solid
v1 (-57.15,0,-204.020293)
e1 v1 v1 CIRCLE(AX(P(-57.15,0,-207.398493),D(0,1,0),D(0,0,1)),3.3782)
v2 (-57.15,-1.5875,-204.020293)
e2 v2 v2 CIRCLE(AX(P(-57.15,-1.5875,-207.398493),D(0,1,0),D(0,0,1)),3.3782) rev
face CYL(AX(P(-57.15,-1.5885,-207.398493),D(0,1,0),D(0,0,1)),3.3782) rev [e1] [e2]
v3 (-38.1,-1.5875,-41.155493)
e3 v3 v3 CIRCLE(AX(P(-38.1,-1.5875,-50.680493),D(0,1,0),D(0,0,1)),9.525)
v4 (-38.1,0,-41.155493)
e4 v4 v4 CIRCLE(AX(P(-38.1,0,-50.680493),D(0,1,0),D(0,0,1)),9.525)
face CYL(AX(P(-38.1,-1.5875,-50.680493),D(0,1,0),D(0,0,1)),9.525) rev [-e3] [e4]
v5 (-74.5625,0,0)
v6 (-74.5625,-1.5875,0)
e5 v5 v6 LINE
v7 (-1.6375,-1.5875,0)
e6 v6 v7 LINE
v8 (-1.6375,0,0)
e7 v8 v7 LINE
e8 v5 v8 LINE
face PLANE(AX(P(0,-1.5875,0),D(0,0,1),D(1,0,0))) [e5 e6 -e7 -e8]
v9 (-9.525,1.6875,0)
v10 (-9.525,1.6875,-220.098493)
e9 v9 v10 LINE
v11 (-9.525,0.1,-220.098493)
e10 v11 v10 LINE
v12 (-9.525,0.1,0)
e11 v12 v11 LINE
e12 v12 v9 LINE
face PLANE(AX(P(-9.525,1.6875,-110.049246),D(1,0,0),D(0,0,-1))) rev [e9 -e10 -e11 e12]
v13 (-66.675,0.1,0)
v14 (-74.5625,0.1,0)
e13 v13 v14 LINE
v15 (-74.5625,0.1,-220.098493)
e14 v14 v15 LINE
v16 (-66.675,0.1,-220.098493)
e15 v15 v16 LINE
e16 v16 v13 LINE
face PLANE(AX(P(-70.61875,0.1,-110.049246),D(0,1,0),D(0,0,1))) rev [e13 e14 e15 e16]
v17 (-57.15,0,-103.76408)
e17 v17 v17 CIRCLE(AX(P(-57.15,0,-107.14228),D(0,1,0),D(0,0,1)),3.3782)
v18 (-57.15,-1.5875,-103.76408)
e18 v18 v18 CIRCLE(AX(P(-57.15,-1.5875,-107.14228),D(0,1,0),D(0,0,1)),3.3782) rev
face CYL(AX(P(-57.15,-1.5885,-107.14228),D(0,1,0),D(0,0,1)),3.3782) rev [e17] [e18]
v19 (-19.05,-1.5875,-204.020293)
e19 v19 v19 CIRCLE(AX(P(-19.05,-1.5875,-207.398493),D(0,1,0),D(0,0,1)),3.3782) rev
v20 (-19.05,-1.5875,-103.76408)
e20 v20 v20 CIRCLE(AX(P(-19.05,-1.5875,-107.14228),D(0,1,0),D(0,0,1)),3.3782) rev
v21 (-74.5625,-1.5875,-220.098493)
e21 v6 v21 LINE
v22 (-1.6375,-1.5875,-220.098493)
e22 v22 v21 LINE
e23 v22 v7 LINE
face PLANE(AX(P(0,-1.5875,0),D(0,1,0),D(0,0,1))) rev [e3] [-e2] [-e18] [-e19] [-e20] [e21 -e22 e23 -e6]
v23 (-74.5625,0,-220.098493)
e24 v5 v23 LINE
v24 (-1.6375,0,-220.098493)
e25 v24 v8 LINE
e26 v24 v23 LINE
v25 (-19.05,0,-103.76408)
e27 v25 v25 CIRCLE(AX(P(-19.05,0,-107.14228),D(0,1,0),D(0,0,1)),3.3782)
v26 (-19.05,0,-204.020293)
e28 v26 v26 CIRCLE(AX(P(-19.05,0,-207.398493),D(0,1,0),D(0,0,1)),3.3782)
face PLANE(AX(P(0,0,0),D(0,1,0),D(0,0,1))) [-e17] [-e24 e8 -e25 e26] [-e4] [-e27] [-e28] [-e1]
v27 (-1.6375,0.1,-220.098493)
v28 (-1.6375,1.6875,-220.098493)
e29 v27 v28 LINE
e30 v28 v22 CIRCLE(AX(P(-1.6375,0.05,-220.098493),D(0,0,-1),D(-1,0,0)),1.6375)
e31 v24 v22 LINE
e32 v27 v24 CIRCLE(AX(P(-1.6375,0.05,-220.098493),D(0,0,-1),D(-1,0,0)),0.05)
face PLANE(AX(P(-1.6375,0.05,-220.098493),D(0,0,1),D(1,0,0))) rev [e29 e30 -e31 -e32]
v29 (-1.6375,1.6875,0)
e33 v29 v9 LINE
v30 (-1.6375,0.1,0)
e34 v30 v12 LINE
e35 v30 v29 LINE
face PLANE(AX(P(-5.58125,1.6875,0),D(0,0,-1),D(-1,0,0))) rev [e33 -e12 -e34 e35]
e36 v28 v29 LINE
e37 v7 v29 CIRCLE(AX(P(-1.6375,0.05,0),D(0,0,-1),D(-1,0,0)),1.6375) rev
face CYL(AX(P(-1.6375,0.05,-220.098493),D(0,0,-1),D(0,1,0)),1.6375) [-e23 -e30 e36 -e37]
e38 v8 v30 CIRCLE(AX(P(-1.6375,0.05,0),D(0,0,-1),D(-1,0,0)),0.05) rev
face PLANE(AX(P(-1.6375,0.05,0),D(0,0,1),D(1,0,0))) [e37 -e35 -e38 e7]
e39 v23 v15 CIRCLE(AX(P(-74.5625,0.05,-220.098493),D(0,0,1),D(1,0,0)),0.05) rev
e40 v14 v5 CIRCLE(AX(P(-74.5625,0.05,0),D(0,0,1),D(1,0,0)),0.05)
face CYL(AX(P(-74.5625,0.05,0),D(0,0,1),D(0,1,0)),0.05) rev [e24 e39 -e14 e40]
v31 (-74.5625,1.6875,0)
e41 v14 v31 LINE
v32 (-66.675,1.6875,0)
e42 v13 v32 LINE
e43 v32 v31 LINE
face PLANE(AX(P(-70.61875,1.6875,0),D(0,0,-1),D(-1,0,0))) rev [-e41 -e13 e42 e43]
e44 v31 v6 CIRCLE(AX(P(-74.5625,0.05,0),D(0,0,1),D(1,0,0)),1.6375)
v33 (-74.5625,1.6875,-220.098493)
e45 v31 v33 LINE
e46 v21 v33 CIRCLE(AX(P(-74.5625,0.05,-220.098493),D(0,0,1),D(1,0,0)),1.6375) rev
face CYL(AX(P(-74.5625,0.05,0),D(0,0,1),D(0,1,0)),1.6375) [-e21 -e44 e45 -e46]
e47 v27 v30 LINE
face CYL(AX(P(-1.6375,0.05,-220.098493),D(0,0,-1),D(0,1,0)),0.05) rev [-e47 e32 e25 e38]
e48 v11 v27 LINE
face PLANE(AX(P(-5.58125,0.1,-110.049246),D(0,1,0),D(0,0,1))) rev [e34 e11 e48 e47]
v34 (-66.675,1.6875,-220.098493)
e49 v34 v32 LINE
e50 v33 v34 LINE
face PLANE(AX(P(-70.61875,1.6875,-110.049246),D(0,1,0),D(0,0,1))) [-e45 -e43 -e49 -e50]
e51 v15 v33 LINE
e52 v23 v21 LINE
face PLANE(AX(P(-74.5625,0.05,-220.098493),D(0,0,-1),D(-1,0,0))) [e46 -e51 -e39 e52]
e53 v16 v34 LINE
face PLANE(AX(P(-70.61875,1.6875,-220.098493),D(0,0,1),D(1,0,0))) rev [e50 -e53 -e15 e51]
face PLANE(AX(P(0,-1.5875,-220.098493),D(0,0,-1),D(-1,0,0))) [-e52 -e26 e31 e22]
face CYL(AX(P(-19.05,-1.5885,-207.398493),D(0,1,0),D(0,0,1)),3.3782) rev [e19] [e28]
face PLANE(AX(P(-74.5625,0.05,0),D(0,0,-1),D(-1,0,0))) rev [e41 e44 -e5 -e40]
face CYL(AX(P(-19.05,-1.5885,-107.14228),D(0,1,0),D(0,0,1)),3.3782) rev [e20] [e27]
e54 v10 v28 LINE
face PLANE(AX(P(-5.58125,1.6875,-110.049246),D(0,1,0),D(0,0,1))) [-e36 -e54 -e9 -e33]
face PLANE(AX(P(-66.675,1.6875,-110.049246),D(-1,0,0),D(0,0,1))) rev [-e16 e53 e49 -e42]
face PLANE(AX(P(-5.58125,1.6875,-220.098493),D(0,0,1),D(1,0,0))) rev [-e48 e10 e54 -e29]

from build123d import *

# Parameters (mm, degrees)
SKETCH1_W          = 76.2
SKETCH1_H          = 220.098493
BASE_FLANGE1_DEPTH = 1.5875
CUT_EXTRUDE1_REACH = 234.921
SKETCH6_R          = 3.3782
SKETCH7_R          = 9.525
CUT_EXTRUDE2_DEPTH = 233.921245869
HEM1_START         = -220.098493
HEM1_DEPTH         = 220.098493
HEM1_2_DEPTH       = 220.098493


# Read off the part's stored shape, not the designer's step: Hem1
# Sheet-metal steps are written as plain solids
with BuildPart() as part:
    # Sketch1 → Base-Flange1 (new body)
    with BuildSketch(Plane(origin=(0, 0, 0), x_dir=(1, 0, 0), z_dir=(0, 1, 0))):
        with Locations((-38.1, 110.0492465)):
            Rectangle(SKETCH1_W, SKETCH1_H)
    extrude(amount=-BASE_FLANGE1_DEPTH)

    # Sketch6 → Cut-Extrude1 (cut, up to next)
    with BuildSketch(Plane(origin=(0, 0, 0), x_dir=(1, 0, 0), z_dir=(0, 1, 0)), mode=Mode.PRIVATE) as cut_extrude1_sk1:
        with Locations(Location((-57.15, 207.398493, 0), (0, 0, 270))):
            Circle(SKETCH6_R)
    cut_extrude1_tool1 = extrude(cut_extrude1_sk1.sketch, amount=-CUT_EXTRUDE1_REACH, mode=Mode.PRIVATE) & part.part
    # Sketch6 → Cut-Extrude1 (cut, up to next)
    with BuildSketch(Plane(origin=(0, 0, 0), x_dir=(1, 0, 0), z_dir=(0, 1, 0)), mode=Mode.PRIVATE) as cut_extrude1_sk2:
        with Locations(Location((-19.05, 207.398493, 0), (0, 0, 270))):
            Circle(SKETCH6_R)
    cut_extrude1_tool2 = extrude(cut_extrude1_sk2.sketch, amount=-CUT_EXTRUDE1_REACH, mode=Mode.PRIVATE) & part.part
    # Sketch6 → Cut-Extrude1 (cut, up to next)
    with BuildSketch(Plane(origin=(0, 0, 0), x_dir=(1, 0, 0), z_dir=(0, 1, 0)), mode=Mode.PRIVATE) as cut_extrude1_sk3:
        with Locations(Location((-19.05, 107.14228, 0), (0, 0, 270))):
            Circle(SKETCH6_R)
    cut_extrude1_tool3 = extrude(cut_extrude1_sk3.sketch, amount=-CUT_EXTRUDE1_REACH, mode=Mode.PRIVATE) & part.part
    # Sketch6 → Cut-Extrude1 (cut, up to next)
    with BuildSketch(Plane(origin=(0, 0, 0), x_dir=(1, 0, 0), z_dir=(0, 1, 0)), mode=Mode.PRIVATE) as cut_extrude1_sk4:
        with Locations(Location((-57.15, 107.14228, 0), (0, 0, 270))):
            Circle(SKETCH6_R)
    cut_extrude1_tool4 = extrude(cut_extrude1_sk4.sketch, amount=-CUT_EXTRUDE1_REACH, mode=Mode.PRIVATE) & part.part
    add(cut_extrude1_tool1.solids().sort_by_distance((-57.15, 0, -207.398493))[0], mode=Mode.SUBTRACT)
    add(cut_extrude1_tool2.solids().sort_by_distance((-19.05, 0, -207.398493))[0], mode=Mode.SUBTRACT)
    add(cut_extrude1_tool3.solids().sort_by_distance((-19.05, 0, -107.14228))[0], mode=Mode.SUBTRACT)
    add(cut_extrude1_tool4.solids().sort_by_distance((-57.15, 0, -107.14228))[0], mode=Mode.SUBTRACT)

    # Sketch7 → Cut-Extrude2 (cut, through all)
    with BuildSketch(Plane(origin=(0, 0, 0), x_dir=(1, 0, 0), z_dir=(0, 1, 0))):
        with Locations(Location((-38.1, 50.680493, 0), (0, 0, 270))):
            Circle(SKETCH7_R)
    extrude(amount=-CUT_EXTRUDE2_DEPTH, mode=Mode.SUBTRACT)

    # Hem1 outline → Hem1 (cut)
    with BuildSketch(Plane.XY.offset(HEM1_START)):
        with BuildLine():
            ThreePointArc((-74.5625, -1.5875), (-75.70257264, -1.125432101), (-76.199236463, 0))
            Line((-76.199236463, 0), (-76.2, 0))
            Line((-76.2, 0), (-76.2, -1.5875))
            Line((-76.2, -1.5875), (-74.5625, -1.5875))
        make_face()
        with BuildLine():
            ThreePointArc((-0.000763537, 0), (-0.49742736, -1.125432101), (-1.6375, -1.5875))
            Line((-1.6375, -1.5875), (0, -1.5875))
            Line((0, -1.5875), (0, 0))
            Line((0, 0), (-0.000763537, 0))
        make_face()
    extrude(amount=HEM1_DEPTH, mode=Mode.SUBTRACT)

    # Hem1 2 outline → Hem1 2 (add)
    with BuildSketch(Plane.XY.offset(HEM1_START)):
        with BuildLine():
            Line((-66.675, 0.1), (-66.675, 1.6875))
            Line((-66.675, 1.6875), (-74.5625, 1.6875))
            ThreePointArc((-74.5625, 1.6875), (-75.737932101, 1.19007264), (-76.199236463, 0))
            Line((-76.199236463, 0), (-74.5625, 0))
            ThreePointArc((-74.5625, 0), (-74.6125, 0.05), (-74.5625, 0.1))
            Line((-74.5625, 0.1), (-66.675, 0.1))
        make_face()
        with BuildLine():
            ThreePointArc((-1.6375, 0.1), (-1.5875, 0.05), (-1.6375, 0))
            Line((-1.6375, 0), (-0.000763537, 0))
            ThreePointArc((-0.000763537, 0), (-0.462067899, 1.19007264), (-1.6375, 1.6875))
            Line((-1.6375, 1.6875), (-9.525, 1.6875))
            Line((-9.525, 1.6875), (-9.525, 0.1))
            Line((-9.525, 0.1), (-1.6375, 0.1))
        make_face()
    extrude(amount=HEM1_2_DEPTH)


solid = part.part
